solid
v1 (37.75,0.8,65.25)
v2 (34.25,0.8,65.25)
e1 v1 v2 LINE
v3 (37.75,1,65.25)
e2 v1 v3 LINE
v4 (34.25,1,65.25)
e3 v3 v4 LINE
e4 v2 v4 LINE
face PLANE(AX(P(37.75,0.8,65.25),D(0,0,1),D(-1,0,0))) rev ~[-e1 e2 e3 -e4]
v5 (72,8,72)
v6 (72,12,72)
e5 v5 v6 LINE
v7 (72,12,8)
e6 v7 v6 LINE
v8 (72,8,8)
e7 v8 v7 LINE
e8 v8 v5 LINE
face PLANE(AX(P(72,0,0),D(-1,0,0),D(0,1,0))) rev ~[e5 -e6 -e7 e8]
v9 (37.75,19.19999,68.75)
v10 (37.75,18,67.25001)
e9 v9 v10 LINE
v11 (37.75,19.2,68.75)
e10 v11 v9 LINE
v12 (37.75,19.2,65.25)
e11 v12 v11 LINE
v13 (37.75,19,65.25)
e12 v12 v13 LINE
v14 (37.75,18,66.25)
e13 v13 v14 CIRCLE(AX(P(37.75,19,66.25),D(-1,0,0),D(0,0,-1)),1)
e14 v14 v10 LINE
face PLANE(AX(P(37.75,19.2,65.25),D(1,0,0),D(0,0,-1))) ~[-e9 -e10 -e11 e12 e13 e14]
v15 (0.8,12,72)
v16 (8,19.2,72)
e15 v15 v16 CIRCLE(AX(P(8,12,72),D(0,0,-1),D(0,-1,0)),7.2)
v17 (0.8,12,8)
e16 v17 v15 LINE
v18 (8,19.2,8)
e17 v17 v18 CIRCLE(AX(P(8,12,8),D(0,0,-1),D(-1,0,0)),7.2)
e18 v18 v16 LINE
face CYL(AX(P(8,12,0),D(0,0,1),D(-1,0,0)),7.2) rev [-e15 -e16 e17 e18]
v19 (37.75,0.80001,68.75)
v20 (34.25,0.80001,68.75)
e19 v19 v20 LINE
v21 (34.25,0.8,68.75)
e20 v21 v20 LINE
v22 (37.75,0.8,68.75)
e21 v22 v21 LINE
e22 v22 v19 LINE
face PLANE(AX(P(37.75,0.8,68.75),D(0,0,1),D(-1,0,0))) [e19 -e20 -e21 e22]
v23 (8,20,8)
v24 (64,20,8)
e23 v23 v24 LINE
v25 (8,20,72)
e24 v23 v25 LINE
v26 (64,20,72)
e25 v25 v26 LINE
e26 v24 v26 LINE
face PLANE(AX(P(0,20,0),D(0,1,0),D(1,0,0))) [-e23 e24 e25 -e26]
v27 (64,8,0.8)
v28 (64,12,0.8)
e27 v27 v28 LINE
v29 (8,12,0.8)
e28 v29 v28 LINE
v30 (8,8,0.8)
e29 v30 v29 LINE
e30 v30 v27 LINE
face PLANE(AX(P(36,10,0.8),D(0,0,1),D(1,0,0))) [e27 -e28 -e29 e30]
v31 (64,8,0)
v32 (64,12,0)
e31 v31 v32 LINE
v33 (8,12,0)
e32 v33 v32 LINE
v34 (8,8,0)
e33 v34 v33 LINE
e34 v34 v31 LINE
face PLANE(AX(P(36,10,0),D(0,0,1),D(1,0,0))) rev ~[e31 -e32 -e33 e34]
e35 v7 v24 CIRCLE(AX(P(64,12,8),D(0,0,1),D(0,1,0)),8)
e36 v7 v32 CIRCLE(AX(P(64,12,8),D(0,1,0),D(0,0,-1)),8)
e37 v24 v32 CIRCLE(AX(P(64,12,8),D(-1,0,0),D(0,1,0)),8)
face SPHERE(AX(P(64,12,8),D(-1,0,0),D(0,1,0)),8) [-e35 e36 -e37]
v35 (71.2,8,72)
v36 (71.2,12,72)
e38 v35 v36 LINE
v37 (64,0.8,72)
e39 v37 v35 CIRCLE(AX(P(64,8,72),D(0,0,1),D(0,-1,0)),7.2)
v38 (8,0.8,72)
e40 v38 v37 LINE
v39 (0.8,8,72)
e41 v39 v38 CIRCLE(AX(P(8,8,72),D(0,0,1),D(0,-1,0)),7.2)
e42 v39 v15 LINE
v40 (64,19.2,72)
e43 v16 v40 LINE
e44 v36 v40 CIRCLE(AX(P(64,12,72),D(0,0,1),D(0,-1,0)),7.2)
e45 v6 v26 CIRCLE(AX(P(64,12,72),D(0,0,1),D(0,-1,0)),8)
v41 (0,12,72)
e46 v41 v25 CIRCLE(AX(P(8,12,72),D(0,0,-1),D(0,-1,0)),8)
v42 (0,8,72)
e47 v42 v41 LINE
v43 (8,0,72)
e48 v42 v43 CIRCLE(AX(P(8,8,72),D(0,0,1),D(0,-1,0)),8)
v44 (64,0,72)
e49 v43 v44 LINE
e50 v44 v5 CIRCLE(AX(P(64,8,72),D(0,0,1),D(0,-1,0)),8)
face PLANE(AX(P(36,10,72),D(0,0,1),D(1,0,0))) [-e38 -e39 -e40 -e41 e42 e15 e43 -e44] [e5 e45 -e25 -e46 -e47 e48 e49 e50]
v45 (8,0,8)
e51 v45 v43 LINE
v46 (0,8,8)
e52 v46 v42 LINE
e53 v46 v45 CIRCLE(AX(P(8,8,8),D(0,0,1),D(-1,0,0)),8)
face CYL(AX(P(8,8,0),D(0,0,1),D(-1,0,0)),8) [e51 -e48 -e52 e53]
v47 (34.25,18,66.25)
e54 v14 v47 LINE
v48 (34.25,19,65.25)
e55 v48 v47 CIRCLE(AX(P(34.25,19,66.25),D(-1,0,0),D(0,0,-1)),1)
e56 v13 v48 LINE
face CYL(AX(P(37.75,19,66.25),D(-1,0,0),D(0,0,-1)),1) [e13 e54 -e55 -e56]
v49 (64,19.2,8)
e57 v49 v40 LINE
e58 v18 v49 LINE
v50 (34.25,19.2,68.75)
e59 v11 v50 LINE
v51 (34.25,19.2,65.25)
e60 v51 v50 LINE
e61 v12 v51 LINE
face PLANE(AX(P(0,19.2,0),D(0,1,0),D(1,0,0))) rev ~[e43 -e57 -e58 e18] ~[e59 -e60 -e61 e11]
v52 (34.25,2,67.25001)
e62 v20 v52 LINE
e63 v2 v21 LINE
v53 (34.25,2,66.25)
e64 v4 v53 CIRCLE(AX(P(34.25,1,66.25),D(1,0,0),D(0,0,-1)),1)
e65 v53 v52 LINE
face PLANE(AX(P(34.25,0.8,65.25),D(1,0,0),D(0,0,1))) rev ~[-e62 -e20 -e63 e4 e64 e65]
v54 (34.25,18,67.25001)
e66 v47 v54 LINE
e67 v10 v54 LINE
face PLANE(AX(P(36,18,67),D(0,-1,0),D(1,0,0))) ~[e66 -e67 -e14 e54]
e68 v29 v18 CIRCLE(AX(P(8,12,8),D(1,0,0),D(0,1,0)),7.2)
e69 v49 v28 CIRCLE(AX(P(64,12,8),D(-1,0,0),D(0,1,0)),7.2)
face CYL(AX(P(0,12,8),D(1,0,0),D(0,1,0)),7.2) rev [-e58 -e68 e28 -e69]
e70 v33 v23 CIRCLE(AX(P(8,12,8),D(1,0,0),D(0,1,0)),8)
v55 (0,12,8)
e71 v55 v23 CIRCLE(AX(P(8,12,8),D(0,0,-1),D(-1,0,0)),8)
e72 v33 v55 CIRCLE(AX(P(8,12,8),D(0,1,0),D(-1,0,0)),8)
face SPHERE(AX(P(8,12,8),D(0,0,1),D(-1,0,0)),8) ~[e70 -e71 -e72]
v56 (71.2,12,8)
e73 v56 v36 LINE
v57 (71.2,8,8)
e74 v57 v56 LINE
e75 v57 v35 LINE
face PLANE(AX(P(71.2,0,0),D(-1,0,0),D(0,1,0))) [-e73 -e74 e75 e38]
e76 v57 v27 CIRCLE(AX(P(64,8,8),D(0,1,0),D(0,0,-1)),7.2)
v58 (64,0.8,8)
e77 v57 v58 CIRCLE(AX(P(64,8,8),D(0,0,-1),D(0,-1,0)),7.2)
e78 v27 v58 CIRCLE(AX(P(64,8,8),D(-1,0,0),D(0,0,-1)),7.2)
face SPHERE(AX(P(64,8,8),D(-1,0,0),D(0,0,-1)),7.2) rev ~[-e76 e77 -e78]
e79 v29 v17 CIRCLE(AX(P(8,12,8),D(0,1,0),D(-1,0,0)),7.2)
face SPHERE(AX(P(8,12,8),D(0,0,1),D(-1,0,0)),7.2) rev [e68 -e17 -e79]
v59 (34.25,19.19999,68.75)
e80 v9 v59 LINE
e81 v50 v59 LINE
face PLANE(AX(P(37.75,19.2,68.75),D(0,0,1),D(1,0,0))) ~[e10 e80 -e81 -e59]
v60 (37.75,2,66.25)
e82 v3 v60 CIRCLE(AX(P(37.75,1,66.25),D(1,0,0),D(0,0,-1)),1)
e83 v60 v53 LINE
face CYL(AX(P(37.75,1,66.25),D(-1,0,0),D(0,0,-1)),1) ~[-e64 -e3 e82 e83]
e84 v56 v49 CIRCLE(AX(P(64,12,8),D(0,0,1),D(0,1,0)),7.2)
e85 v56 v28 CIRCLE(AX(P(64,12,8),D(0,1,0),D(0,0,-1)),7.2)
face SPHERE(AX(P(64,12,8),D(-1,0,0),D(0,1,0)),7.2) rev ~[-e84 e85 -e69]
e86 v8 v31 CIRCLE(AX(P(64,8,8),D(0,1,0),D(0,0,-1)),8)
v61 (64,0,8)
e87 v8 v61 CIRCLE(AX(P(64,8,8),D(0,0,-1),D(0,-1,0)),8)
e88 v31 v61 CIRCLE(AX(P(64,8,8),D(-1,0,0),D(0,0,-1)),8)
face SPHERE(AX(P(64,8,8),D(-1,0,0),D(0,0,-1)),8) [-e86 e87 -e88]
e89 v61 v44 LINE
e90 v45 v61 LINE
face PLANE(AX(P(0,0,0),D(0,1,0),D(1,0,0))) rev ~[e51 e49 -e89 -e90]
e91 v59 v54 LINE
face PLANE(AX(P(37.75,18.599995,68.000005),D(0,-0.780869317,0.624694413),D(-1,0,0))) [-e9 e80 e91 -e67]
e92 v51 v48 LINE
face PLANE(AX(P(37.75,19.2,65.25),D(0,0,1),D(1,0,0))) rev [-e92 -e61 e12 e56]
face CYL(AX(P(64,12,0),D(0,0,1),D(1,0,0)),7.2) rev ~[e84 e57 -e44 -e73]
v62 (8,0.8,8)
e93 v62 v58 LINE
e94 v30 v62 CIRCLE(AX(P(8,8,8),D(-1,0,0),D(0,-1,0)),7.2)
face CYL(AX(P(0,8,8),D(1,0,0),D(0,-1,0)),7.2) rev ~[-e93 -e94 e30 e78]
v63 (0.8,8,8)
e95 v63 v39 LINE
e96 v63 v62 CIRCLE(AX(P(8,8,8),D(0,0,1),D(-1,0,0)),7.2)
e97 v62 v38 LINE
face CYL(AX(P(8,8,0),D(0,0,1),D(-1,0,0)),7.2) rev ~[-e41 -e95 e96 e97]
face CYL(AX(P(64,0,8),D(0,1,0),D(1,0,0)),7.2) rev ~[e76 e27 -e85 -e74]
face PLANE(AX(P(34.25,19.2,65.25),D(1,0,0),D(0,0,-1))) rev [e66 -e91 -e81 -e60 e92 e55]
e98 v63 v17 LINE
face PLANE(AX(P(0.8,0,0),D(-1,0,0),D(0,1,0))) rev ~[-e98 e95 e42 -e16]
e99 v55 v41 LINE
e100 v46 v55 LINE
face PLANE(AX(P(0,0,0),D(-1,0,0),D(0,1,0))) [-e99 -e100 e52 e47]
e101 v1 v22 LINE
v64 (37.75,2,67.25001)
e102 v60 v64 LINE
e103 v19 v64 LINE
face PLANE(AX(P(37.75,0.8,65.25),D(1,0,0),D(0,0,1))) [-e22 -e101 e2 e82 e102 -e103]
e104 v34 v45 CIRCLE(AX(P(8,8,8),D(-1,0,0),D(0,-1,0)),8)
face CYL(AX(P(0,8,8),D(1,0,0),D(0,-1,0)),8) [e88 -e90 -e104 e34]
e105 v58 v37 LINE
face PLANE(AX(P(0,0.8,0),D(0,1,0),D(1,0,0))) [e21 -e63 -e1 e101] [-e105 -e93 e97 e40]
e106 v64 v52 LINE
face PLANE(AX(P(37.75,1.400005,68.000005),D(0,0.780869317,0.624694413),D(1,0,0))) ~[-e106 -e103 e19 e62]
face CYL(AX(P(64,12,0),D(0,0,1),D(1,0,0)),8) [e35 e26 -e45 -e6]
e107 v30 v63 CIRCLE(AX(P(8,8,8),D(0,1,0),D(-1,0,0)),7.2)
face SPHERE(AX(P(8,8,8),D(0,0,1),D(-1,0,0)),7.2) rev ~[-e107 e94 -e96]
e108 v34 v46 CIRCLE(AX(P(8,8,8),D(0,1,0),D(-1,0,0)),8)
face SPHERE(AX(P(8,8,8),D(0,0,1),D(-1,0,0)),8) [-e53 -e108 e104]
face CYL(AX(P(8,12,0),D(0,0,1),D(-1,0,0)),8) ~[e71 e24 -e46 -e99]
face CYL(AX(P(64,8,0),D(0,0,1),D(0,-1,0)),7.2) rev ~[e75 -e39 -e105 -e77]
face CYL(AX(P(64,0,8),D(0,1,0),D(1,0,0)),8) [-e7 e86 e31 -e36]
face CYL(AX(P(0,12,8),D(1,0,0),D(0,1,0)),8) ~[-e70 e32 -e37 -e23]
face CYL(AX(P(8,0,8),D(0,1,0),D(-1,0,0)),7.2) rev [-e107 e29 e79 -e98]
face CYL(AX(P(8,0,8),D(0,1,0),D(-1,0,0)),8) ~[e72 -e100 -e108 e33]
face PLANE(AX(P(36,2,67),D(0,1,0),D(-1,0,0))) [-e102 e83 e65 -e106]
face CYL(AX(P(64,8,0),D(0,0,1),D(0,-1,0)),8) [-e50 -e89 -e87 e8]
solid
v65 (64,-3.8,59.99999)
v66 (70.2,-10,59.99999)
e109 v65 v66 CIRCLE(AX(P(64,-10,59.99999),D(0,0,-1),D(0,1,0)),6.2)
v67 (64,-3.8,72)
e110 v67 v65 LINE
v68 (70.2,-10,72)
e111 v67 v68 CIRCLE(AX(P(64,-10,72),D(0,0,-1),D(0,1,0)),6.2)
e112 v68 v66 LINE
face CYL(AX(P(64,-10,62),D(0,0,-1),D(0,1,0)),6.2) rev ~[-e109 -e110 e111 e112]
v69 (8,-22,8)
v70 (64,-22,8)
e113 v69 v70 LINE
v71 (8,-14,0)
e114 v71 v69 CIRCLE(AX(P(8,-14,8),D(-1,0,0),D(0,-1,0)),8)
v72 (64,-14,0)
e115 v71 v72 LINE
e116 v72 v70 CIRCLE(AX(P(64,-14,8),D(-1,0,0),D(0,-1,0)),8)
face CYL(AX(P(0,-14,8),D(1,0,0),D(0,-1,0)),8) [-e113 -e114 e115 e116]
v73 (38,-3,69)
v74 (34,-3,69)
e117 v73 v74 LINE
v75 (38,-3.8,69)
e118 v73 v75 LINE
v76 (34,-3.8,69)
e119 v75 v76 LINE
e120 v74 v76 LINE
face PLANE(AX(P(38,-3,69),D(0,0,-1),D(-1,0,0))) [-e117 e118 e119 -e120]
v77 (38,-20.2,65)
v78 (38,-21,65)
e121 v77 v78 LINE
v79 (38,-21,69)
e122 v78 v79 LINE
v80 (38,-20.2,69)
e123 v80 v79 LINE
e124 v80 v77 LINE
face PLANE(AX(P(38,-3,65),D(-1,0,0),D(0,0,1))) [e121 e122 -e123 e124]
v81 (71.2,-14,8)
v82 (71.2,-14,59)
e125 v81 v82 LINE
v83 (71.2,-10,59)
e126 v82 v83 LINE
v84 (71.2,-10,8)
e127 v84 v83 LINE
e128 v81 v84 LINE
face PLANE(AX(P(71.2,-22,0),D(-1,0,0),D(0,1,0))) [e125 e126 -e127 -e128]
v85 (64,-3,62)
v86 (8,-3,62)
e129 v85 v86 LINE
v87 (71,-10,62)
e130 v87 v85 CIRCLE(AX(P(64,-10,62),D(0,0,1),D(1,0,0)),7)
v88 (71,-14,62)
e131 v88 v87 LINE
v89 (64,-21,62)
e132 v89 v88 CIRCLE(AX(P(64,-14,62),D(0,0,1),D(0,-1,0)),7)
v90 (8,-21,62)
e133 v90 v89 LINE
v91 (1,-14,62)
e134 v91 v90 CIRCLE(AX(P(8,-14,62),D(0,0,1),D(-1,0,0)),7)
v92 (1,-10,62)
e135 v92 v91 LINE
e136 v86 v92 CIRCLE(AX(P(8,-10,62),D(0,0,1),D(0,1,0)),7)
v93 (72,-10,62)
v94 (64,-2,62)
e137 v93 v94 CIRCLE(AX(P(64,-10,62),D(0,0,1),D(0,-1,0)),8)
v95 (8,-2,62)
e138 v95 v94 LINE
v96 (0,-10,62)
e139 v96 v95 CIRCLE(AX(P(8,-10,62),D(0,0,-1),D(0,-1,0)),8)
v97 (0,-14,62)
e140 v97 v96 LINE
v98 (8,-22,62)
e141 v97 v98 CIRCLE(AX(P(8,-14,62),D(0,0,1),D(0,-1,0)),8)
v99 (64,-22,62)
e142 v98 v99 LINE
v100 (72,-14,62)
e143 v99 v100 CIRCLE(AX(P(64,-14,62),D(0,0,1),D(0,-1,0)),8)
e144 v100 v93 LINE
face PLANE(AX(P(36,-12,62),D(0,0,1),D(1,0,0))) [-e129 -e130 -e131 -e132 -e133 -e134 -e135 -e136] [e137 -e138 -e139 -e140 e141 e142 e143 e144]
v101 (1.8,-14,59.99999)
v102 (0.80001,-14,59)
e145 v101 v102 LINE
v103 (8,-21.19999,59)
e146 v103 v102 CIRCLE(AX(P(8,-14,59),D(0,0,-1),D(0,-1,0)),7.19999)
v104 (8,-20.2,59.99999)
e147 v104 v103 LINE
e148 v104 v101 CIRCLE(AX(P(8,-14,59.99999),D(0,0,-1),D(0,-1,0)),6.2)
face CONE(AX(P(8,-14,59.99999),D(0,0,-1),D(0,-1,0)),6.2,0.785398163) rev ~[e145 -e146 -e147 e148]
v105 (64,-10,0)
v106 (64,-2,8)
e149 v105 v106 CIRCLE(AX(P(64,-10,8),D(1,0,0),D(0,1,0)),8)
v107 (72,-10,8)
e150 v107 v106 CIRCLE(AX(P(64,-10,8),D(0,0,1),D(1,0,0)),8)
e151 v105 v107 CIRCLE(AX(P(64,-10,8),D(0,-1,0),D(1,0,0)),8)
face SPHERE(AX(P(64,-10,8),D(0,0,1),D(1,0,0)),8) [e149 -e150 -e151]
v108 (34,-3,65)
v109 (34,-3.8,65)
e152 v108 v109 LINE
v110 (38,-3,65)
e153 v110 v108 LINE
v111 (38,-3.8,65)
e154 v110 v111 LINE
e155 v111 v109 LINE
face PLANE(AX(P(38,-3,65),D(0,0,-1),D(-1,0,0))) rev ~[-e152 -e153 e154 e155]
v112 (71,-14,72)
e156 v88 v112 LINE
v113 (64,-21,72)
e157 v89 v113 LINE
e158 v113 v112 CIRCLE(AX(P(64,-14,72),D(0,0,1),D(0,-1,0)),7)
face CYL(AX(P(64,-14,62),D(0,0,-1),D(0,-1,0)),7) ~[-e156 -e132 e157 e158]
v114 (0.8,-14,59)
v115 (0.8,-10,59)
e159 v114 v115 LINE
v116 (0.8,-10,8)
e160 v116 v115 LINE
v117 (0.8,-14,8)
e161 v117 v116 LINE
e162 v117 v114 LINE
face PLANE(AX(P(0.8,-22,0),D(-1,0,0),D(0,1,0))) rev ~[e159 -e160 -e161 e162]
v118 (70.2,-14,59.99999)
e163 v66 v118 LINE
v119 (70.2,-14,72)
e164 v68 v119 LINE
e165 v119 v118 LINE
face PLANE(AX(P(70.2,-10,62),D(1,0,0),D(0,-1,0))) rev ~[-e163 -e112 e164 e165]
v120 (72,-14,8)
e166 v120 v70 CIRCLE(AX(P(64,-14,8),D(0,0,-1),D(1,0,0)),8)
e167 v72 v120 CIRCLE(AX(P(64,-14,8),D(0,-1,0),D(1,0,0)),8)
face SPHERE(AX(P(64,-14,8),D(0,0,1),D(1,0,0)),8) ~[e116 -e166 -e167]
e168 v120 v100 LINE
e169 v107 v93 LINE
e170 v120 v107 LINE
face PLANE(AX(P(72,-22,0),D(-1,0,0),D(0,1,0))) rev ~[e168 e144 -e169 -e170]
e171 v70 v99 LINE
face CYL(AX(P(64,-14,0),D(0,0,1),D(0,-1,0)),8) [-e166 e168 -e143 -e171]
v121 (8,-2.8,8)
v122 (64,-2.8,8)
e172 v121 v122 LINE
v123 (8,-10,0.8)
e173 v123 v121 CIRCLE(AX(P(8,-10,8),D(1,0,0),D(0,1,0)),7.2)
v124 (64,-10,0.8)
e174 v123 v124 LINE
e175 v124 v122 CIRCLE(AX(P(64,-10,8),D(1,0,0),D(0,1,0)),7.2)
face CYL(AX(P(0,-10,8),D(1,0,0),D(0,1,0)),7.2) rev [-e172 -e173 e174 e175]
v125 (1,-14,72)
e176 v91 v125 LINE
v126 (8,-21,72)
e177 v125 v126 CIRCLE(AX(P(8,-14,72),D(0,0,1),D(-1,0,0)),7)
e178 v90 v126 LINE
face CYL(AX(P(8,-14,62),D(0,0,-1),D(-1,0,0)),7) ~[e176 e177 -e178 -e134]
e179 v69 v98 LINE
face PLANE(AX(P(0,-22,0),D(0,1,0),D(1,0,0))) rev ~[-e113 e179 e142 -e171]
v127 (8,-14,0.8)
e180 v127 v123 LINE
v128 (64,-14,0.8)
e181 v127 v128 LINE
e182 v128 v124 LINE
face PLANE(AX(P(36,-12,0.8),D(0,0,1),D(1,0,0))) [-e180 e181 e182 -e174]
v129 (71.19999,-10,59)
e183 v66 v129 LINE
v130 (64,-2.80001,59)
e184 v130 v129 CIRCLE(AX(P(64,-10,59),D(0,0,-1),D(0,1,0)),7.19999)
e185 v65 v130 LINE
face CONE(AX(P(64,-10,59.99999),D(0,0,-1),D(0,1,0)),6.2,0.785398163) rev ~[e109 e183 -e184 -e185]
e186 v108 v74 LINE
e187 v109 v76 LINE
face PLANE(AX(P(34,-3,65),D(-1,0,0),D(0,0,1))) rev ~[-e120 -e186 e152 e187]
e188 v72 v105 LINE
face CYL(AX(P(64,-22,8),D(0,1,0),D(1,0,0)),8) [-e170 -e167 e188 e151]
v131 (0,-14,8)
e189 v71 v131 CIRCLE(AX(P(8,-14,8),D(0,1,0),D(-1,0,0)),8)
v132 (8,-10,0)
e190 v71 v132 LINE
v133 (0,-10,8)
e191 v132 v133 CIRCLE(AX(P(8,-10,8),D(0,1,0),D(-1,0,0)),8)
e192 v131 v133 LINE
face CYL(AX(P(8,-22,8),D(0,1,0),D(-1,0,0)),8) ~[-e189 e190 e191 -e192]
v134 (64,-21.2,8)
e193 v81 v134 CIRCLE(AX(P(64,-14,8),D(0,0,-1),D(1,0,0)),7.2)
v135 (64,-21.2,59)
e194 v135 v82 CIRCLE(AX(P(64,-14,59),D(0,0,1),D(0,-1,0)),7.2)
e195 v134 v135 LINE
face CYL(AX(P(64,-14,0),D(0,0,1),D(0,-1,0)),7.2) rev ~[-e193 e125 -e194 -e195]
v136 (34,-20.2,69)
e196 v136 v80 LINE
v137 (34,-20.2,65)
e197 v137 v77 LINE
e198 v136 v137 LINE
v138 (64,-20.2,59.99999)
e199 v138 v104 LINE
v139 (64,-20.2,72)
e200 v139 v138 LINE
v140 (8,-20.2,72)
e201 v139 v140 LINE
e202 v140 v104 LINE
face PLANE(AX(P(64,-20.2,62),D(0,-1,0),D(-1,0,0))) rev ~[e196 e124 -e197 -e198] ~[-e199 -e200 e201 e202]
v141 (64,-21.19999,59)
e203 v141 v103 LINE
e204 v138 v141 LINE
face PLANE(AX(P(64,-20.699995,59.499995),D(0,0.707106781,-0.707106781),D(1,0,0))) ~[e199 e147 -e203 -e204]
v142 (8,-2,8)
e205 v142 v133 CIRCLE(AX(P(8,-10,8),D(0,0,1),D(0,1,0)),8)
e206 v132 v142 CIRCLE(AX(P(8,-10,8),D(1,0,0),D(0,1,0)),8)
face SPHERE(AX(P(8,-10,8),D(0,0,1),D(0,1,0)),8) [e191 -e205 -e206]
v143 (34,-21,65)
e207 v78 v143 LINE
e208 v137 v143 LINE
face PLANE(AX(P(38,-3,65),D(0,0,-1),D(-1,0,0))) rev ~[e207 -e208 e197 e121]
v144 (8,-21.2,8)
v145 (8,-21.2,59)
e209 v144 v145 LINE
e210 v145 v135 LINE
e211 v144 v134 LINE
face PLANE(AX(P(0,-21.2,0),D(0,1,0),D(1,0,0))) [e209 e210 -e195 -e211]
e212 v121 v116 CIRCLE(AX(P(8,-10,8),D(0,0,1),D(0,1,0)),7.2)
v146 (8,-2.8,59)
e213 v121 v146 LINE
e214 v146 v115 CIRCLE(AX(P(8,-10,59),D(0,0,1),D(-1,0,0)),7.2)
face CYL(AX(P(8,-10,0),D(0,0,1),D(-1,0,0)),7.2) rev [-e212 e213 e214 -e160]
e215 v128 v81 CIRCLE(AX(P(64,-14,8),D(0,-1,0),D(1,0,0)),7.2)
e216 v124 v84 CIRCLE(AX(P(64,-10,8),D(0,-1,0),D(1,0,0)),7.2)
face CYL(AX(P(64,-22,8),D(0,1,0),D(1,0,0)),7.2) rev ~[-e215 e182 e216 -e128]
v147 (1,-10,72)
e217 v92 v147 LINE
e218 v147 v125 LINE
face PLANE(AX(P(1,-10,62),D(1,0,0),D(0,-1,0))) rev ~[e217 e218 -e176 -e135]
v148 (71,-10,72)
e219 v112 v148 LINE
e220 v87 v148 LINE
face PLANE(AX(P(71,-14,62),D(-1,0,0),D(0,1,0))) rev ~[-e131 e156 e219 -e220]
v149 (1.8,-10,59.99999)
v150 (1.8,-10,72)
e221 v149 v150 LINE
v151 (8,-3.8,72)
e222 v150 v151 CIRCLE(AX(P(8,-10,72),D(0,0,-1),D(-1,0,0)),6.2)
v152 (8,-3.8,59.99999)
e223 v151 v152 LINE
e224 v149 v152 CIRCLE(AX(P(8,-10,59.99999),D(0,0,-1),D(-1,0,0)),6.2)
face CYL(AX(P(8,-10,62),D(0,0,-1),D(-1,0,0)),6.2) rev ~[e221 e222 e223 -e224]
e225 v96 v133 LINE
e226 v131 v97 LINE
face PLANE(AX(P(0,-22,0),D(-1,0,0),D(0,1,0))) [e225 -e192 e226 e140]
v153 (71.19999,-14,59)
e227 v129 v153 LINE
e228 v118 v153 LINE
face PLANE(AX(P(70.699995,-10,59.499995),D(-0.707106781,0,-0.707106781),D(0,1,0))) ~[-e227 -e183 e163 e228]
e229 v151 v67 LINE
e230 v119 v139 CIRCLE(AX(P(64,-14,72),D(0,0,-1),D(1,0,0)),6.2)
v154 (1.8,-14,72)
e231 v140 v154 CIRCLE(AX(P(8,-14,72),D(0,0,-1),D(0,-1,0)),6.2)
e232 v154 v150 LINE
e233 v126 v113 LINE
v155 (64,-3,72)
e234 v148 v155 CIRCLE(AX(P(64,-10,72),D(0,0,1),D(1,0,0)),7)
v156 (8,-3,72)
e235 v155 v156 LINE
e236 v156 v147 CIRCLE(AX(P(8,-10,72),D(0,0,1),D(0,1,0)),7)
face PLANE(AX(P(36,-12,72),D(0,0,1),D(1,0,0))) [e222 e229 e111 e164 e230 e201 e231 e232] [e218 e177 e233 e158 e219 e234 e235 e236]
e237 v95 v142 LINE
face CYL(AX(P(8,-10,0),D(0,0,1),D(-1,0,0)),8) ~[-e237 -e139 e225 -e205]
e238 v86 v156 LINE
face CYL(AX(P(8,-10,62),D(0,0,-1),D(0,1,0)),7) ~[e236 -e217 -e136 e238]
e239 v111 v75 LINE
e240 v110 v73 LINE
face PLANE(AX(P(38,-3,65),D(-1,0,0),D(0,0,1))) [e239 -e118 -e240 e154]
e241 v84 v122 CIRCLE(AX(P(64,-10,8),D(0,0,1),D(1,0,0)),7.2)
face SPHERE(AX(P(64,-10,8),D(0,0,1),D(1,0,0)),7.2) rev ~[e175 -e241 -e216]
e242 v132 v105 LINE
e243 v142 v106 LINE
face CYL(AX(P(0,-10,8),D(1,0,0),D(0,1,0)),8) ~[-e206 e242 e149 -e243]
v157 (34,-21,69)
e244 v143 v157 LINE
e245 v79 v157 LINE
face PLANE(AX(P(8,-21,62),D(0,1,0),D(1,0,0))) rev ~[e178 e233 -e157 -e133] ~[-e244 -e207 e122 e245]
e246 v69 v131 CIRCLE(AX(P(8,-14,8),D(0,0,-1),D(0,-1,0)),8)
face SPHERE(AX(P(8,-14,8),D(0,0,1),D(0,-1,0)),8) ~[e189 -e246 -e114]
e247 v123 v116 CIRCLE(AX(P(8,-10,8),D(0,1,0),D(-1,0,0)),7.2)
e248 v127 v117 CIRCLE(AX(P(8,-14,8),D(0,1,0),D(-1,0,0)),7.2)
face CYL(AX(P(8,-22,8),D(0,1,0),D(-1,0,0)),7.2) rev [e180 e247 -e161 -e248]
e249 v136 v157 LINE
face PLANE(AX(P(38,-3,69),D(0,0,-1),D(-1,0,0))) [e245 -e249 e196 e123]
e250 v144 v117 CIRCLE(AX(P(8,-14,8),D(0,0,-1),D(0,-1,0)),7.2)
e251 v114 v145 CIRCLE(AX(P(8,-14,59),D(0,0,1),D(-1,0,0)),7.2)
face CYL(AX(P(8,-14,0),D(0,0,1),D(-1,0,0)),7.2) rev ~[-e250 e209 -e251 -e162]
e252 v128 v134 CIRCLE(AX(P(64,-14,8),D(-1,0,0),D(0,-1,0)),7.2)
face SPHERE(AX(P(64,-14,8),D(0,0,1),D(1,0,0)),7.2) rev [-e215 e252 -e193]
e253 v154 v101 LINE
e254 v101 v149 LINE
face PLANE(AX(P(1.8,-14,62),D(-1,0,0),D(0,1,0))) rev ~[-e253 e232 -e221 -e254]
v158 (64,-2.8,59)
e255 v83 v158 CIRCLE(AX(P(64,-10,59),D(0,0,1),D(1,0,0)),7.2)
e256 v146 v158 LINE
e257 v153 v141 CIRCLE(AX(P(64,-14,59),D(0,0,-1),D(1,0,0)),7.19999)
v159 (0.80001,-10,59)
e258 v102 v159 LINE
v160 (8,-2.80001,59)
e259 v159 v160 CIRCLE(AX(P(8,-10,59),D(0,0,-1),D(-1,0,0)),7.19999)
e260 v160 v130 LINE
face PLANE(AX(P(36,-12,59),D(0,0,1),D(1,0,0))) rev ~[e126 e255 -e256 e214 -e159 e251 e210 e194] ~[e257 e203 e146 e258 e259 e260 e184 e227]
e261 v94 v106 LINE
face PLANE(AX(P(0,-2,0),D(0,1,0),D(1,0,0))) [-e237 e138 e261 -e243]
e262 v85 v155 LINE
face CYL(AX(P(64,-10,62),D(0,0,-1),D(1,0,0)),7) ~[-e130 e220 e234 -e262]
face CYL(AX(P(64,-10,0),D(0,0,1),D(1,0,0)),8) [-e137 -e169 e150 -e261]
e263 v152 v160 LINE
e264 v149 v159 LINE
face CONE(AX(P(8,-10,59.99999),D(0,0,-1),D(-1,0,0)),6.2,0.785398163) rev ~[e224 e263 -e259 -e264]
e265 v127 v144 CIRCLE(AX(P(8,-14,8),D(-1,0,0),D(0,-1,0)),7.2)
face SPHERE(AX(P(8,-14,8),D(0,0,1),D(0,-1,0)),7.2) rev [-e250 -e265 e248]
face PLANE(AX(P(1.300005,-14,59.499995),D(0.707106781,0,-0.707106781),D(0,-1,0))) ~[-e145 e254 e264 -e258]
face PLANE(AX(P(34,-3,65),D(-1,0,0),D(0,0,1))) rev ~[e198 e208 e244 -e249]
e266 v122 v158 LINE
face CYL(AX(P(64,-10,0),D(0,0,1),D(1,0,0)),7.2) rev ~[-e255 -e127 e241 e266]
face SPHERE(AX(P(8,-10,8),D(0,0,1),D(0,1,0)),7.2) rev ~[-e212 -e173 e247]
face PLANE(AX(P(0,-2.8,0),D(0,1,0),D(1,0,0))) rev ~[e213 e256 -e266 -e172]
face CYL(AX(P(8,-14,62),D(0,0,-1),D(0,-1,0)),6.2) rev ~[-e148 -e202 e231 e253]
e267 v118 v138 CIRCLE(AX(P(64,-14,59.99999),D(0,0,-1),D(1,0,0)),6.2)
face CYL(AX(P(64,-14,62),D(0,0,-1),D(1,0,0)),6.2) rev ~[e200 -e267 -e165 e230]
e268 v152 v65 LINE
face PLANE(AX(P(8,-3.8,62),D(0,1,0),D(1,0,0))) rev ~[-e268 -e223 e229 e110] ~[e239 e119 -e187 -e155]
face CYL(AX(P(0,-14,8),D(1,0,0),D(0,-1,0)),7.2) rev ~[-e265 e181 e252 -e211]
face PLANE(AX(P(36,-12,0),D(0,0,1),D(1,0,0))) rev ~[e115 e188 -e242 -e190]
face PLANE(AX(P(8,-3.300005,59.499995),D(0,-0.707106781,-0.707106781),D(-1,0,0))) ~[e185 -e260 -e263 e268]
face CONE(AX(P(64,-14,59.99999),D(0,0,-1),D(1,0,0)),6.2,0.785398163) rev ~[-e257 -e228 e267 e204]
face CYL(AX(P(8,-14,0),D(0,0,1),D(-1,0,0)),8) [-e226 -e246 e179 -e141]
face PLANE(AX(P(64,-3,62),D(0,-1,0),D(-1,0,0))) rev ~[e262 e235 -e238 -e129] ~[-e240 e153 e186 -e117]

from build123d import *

# Parameters (mm, degrees)
F0_W      = 72
F0_H      = 20
F1_DEPTH  = 72
F2_R      = 8
F2_2_R    = 8
F3_T      = -0.8
F3_2_T    = -0.8
F4_W      = 3.5
F4_H      = 3.5
F5_DEPTH  = 1.2
F6_R      = 1
F7_SIZE2  = 1.49999
F7_SIZE   = 1.19999
F10_DEPTH = 10
F12_DEPTH = 3
F14_DEPTH = 10
F15_W     = 4
F15_H     = 4
F16_DEPTH = 25
F17_SIZE  = 0.99999


# Not quite as in the source:
# - a fillet or chamfer is up to 0.001 mm smaller than in the source, because OpenCascade refuses the exact size


with BuildPart() as f1:
    # F0 (on Top) → F1 (new body)
    with BuildSketch(Plane.XY):
        with Locations((36, 10)):
            Rectangle(F0_W, F0_H)
    extrude(amount=F1_DEPTH)

    # F2
    f2_edges = [f1.edges().sort_by_distance(p)[0] for p in [
        (0, 20, 36),
        (0, 0, 36),
        (0, 10, 0),
        (36, 20, 0),
        (36, 0, 0),
        (72, 20, 36),
        (72, 10, 0),
        (72, 0, 36),
    ]]
    fillet(f2_edges, radius=F2_R)

    # F3
    f3_openings = [f1.faces().sort_by_distance(p)[0] for p in [
        (36, 10, 72),
    ]]
    offset(amount=F3_T, openings=f3_openings)

    # F4 (on face) → F5 (join)
    with BuildSketch(Plane(origin=(0, 0.8, 0), x_dir=(-1, 0, 0), z_dir=(0, 1, 0))):
        with Locations((-36, 67)):
            Rectangle(F4_W, F4_H)
    extrude(amount=F5_DEPTH)

    # F6
    f6_edges = [f1.edges().sort_by_distance(p)[0] for p in [
        (36, 2, 65.25),
    ]]
    fillet(f6_edges, radius=F6_R)

    # F7 (size 1.2 and 1.5 in the source; OpenCascade refuses exactly that, so slightly less here)
    f7_edges = [f1.edges().sort_by_distance(p)[0] for p in [
        (36, 2, 68.75),
    ]]
    f7_side = f1.faces().sort_by_distance((36, 1.4, 68.75))[0]
    chamfer(f7_edges, length=F7_SIZE, length2=F7_SIZE2, reference=f7_side)

    # F9: F1 across plane


with BuildPart() as f1b:
    # F0 (on Top) → F1, piece 2 (new body)
    with BuildSketch(Plane.XY):
        with Locations((36, -12)):
            Rectangle(F0_W, F0_H)
    extrude(amount=F1_DEPTH)

    # F2#2
    f2_2_edges = [f1b.edges().sort_by_distance(p)[0] for p in [
        (0, -2, 36),
        (0, -22, 36),
        (72, -22, 36),
        (72, -2, 36),
        (72, -12, 0),
        (36, -2, 0),
        (36, -22, 0),
        (0, -12, 0),
    ]]
    fillet(f2_2_edges, radius=F2_2_R)

    # F3#2
    f3_2_openings = [f1b.faces().sort_by_distance(p)[0] for p in [
        (36, -12, 72),
    ]]
    offset(amount=F3_2_T, openings=f3_2_openings)

    # F10 (cut): a face of the model
    f10_faces = [f1b.faces().sort_by_distance(p)[0] for p in [
        (36, -2.7472616677, 72),
    ]]
    extrude(f10_faces, amount=-F10_DEPTH, mode=Mode.SUBTRACT)

    # F11 (on face) → F12 (join)
    with BuildSketch(Plane.XY.offset(62)):
        with BuildLine():
            ThreePointArc((72, -10), (69.6568542495, -4.3431457505), (64, -2))
            Line((64, -2), (8, -2))
            ThreePointArc((8, -2), (2.3431457505, -4.3431457505), (0, -10))
            Line((0, -10), (0, -14))
            ThreePointArc((0, -14), (2.3431457505, -19.6568542495), (8, -22))
            Line((8, -22), (64, -22))
            ThreePointArc((64, -22), (69.6568542495, -19.6568542495), (72, -14))
            Line((72, -14), (72, -10))
        make_face()
        with BuildLine():
            ThreePointArc((0.8, -10), (2.9088311755, -4.9088311755), (8, -2.8))
            Line((8, -2.8), (64, -2.8))
            ThreePointArc((64, -2.8), (69.0911688245, -4.9088311755), (71.2, -10))
            Line((71.2, -10), (71.2, -14))
            ThreePointArc((71.2, -14), (69.0911688245, -19.0911688245), (64, -21.2))
            Line((64, -21.2), (8, -21.2))
            ThreePointArc((8, -21.2), (2.9088311755, -19.0911688245), (0.8, -14))
            Line((0.8, -14), (0.8, -10))
        make_face(mode=Mode.SUBTRACT)
        with BuildLine():
            Line((64, -2.8), (8, -2.8))
            ThreePointArc((8, -2.8), (2.9088311755, -4.9088311755), (0.8, -10))
            Line((0.8, -10), (0.8, -14))
            ThreePointArc((0.8, -14), (2.9088311755, -19.0911688245), (8, -21.2))
            Line((8, -21.2), (64, -21.2))
            ThreePointArc((64, -21.2), (69.0911688245, -19.0911688245), (71.2, -14))
            Line((71.2, -14), (71.2, -10))
            ThreePointArc((71.2, -10), (69.0911688245, -4.9088311755), (64, -2.8))
        make_face()
        with BuildLine():
            ThreePointArc((1.8, -10), (3.6159379566, -5.6159379566), (8, -3.8))
            Line((8, -3.8), (64, -3.8))
            ThreePointArc((64, -3.8), (68.3840620434, -5.6159379566), (70.2, -10))
            Line((70.2, -10), (70.2, -14))
            ThreePointArc((70.2, -14), (68.3840620434, -18.3840620434), (64, -20.2))
            Line((64, -20.2), (8, -20.2))
            ThreePointArc((8, -20.2), (3.6159379566, -18.3840620434), (1.8, -14))
            Line((1.8, -14), (1.8, -10))
        make_face(mode=Mode.SUBTRACT)
    extrude(amount=-F12_DEPTH)

    # F13 (on face) → F14 (join)
    with BuildSketch(Plane.XY.offset(62)):
        with BuildLine():
            Line((64, -3), (8, -3))
            ThreePointArc((8, -3), (3.0502525317, -5.0502525317), (1, -10))
            Line((1, -10), (1, -14))
            ThreePointArc((1, -14), (3.0502525317, -18.9497474683), (8, -21))
            Line((8, -21), (64, -21))
            ThreePointArc((64, -21), (68.9497474683, -18.9497474683), (71, -14))
            Line((71, -14), (71, -10))
            ThreePointArc((71, -10), (68.9497474683, -5.0502525317), (64, -3))
        make_face()
        with BuildLine():
            ThreePointArc((1.8, -10), (3.6159379566, -5.6159379566), (8, -3.8))
            Line((8, -3.8), (64, -3.8))
            ThreePointArc((64, -3.8), (68.3840620434, -5.6159379566), (70.2, -10))
            Line((70.2, -10), (70.2, -14))
            ThreePointArc((70.2, -14), (68.3840620434, -18.3840620434), (64, -20.2))
            Line((64, -20.2), (8, -20.2))
            ThreePointArc((8, -20.2), (3.6159379566, -18.3840620434), (1.8, -14))
            Line((1.8, -14), (1.8, -10))
        make_face(mode=Mode.SUBTRACT)
    extrude(amount=F14_DEPTH)

    # F15 (on face) → F16 (cut)
    with BuildSketch(Plane(origin=(0, -3, 0), x_dir=(-1, 0, 0), z_dir=(0, 1, 0))):
        with Locations((-36, 67)):
            Rectangle(F15_W, F15_H)
    extrude(amount=-F16_DEPTH, mode=Mode.SUBTRACT)

    # F17 (size 1 in the source; OpenCascade refuses exactly that, so slightly less here)
    f17_edges = [f1b.edges().sort_by_distance(p)[0] for p in [
        (36, -20.2, 59),
    ]]
    chamfer(f17_edges, length=F17_SIZE)


with BuildPart() as f1_1:
    add(f1.part)
    add(f1.part.mirror(Plane(origin=(36, 10, 39.9536991671), x_dir=(1, 0, 0), z_dir=(0, -1, 0))))


solid = Compound([f1b.part, f1_1.part])
